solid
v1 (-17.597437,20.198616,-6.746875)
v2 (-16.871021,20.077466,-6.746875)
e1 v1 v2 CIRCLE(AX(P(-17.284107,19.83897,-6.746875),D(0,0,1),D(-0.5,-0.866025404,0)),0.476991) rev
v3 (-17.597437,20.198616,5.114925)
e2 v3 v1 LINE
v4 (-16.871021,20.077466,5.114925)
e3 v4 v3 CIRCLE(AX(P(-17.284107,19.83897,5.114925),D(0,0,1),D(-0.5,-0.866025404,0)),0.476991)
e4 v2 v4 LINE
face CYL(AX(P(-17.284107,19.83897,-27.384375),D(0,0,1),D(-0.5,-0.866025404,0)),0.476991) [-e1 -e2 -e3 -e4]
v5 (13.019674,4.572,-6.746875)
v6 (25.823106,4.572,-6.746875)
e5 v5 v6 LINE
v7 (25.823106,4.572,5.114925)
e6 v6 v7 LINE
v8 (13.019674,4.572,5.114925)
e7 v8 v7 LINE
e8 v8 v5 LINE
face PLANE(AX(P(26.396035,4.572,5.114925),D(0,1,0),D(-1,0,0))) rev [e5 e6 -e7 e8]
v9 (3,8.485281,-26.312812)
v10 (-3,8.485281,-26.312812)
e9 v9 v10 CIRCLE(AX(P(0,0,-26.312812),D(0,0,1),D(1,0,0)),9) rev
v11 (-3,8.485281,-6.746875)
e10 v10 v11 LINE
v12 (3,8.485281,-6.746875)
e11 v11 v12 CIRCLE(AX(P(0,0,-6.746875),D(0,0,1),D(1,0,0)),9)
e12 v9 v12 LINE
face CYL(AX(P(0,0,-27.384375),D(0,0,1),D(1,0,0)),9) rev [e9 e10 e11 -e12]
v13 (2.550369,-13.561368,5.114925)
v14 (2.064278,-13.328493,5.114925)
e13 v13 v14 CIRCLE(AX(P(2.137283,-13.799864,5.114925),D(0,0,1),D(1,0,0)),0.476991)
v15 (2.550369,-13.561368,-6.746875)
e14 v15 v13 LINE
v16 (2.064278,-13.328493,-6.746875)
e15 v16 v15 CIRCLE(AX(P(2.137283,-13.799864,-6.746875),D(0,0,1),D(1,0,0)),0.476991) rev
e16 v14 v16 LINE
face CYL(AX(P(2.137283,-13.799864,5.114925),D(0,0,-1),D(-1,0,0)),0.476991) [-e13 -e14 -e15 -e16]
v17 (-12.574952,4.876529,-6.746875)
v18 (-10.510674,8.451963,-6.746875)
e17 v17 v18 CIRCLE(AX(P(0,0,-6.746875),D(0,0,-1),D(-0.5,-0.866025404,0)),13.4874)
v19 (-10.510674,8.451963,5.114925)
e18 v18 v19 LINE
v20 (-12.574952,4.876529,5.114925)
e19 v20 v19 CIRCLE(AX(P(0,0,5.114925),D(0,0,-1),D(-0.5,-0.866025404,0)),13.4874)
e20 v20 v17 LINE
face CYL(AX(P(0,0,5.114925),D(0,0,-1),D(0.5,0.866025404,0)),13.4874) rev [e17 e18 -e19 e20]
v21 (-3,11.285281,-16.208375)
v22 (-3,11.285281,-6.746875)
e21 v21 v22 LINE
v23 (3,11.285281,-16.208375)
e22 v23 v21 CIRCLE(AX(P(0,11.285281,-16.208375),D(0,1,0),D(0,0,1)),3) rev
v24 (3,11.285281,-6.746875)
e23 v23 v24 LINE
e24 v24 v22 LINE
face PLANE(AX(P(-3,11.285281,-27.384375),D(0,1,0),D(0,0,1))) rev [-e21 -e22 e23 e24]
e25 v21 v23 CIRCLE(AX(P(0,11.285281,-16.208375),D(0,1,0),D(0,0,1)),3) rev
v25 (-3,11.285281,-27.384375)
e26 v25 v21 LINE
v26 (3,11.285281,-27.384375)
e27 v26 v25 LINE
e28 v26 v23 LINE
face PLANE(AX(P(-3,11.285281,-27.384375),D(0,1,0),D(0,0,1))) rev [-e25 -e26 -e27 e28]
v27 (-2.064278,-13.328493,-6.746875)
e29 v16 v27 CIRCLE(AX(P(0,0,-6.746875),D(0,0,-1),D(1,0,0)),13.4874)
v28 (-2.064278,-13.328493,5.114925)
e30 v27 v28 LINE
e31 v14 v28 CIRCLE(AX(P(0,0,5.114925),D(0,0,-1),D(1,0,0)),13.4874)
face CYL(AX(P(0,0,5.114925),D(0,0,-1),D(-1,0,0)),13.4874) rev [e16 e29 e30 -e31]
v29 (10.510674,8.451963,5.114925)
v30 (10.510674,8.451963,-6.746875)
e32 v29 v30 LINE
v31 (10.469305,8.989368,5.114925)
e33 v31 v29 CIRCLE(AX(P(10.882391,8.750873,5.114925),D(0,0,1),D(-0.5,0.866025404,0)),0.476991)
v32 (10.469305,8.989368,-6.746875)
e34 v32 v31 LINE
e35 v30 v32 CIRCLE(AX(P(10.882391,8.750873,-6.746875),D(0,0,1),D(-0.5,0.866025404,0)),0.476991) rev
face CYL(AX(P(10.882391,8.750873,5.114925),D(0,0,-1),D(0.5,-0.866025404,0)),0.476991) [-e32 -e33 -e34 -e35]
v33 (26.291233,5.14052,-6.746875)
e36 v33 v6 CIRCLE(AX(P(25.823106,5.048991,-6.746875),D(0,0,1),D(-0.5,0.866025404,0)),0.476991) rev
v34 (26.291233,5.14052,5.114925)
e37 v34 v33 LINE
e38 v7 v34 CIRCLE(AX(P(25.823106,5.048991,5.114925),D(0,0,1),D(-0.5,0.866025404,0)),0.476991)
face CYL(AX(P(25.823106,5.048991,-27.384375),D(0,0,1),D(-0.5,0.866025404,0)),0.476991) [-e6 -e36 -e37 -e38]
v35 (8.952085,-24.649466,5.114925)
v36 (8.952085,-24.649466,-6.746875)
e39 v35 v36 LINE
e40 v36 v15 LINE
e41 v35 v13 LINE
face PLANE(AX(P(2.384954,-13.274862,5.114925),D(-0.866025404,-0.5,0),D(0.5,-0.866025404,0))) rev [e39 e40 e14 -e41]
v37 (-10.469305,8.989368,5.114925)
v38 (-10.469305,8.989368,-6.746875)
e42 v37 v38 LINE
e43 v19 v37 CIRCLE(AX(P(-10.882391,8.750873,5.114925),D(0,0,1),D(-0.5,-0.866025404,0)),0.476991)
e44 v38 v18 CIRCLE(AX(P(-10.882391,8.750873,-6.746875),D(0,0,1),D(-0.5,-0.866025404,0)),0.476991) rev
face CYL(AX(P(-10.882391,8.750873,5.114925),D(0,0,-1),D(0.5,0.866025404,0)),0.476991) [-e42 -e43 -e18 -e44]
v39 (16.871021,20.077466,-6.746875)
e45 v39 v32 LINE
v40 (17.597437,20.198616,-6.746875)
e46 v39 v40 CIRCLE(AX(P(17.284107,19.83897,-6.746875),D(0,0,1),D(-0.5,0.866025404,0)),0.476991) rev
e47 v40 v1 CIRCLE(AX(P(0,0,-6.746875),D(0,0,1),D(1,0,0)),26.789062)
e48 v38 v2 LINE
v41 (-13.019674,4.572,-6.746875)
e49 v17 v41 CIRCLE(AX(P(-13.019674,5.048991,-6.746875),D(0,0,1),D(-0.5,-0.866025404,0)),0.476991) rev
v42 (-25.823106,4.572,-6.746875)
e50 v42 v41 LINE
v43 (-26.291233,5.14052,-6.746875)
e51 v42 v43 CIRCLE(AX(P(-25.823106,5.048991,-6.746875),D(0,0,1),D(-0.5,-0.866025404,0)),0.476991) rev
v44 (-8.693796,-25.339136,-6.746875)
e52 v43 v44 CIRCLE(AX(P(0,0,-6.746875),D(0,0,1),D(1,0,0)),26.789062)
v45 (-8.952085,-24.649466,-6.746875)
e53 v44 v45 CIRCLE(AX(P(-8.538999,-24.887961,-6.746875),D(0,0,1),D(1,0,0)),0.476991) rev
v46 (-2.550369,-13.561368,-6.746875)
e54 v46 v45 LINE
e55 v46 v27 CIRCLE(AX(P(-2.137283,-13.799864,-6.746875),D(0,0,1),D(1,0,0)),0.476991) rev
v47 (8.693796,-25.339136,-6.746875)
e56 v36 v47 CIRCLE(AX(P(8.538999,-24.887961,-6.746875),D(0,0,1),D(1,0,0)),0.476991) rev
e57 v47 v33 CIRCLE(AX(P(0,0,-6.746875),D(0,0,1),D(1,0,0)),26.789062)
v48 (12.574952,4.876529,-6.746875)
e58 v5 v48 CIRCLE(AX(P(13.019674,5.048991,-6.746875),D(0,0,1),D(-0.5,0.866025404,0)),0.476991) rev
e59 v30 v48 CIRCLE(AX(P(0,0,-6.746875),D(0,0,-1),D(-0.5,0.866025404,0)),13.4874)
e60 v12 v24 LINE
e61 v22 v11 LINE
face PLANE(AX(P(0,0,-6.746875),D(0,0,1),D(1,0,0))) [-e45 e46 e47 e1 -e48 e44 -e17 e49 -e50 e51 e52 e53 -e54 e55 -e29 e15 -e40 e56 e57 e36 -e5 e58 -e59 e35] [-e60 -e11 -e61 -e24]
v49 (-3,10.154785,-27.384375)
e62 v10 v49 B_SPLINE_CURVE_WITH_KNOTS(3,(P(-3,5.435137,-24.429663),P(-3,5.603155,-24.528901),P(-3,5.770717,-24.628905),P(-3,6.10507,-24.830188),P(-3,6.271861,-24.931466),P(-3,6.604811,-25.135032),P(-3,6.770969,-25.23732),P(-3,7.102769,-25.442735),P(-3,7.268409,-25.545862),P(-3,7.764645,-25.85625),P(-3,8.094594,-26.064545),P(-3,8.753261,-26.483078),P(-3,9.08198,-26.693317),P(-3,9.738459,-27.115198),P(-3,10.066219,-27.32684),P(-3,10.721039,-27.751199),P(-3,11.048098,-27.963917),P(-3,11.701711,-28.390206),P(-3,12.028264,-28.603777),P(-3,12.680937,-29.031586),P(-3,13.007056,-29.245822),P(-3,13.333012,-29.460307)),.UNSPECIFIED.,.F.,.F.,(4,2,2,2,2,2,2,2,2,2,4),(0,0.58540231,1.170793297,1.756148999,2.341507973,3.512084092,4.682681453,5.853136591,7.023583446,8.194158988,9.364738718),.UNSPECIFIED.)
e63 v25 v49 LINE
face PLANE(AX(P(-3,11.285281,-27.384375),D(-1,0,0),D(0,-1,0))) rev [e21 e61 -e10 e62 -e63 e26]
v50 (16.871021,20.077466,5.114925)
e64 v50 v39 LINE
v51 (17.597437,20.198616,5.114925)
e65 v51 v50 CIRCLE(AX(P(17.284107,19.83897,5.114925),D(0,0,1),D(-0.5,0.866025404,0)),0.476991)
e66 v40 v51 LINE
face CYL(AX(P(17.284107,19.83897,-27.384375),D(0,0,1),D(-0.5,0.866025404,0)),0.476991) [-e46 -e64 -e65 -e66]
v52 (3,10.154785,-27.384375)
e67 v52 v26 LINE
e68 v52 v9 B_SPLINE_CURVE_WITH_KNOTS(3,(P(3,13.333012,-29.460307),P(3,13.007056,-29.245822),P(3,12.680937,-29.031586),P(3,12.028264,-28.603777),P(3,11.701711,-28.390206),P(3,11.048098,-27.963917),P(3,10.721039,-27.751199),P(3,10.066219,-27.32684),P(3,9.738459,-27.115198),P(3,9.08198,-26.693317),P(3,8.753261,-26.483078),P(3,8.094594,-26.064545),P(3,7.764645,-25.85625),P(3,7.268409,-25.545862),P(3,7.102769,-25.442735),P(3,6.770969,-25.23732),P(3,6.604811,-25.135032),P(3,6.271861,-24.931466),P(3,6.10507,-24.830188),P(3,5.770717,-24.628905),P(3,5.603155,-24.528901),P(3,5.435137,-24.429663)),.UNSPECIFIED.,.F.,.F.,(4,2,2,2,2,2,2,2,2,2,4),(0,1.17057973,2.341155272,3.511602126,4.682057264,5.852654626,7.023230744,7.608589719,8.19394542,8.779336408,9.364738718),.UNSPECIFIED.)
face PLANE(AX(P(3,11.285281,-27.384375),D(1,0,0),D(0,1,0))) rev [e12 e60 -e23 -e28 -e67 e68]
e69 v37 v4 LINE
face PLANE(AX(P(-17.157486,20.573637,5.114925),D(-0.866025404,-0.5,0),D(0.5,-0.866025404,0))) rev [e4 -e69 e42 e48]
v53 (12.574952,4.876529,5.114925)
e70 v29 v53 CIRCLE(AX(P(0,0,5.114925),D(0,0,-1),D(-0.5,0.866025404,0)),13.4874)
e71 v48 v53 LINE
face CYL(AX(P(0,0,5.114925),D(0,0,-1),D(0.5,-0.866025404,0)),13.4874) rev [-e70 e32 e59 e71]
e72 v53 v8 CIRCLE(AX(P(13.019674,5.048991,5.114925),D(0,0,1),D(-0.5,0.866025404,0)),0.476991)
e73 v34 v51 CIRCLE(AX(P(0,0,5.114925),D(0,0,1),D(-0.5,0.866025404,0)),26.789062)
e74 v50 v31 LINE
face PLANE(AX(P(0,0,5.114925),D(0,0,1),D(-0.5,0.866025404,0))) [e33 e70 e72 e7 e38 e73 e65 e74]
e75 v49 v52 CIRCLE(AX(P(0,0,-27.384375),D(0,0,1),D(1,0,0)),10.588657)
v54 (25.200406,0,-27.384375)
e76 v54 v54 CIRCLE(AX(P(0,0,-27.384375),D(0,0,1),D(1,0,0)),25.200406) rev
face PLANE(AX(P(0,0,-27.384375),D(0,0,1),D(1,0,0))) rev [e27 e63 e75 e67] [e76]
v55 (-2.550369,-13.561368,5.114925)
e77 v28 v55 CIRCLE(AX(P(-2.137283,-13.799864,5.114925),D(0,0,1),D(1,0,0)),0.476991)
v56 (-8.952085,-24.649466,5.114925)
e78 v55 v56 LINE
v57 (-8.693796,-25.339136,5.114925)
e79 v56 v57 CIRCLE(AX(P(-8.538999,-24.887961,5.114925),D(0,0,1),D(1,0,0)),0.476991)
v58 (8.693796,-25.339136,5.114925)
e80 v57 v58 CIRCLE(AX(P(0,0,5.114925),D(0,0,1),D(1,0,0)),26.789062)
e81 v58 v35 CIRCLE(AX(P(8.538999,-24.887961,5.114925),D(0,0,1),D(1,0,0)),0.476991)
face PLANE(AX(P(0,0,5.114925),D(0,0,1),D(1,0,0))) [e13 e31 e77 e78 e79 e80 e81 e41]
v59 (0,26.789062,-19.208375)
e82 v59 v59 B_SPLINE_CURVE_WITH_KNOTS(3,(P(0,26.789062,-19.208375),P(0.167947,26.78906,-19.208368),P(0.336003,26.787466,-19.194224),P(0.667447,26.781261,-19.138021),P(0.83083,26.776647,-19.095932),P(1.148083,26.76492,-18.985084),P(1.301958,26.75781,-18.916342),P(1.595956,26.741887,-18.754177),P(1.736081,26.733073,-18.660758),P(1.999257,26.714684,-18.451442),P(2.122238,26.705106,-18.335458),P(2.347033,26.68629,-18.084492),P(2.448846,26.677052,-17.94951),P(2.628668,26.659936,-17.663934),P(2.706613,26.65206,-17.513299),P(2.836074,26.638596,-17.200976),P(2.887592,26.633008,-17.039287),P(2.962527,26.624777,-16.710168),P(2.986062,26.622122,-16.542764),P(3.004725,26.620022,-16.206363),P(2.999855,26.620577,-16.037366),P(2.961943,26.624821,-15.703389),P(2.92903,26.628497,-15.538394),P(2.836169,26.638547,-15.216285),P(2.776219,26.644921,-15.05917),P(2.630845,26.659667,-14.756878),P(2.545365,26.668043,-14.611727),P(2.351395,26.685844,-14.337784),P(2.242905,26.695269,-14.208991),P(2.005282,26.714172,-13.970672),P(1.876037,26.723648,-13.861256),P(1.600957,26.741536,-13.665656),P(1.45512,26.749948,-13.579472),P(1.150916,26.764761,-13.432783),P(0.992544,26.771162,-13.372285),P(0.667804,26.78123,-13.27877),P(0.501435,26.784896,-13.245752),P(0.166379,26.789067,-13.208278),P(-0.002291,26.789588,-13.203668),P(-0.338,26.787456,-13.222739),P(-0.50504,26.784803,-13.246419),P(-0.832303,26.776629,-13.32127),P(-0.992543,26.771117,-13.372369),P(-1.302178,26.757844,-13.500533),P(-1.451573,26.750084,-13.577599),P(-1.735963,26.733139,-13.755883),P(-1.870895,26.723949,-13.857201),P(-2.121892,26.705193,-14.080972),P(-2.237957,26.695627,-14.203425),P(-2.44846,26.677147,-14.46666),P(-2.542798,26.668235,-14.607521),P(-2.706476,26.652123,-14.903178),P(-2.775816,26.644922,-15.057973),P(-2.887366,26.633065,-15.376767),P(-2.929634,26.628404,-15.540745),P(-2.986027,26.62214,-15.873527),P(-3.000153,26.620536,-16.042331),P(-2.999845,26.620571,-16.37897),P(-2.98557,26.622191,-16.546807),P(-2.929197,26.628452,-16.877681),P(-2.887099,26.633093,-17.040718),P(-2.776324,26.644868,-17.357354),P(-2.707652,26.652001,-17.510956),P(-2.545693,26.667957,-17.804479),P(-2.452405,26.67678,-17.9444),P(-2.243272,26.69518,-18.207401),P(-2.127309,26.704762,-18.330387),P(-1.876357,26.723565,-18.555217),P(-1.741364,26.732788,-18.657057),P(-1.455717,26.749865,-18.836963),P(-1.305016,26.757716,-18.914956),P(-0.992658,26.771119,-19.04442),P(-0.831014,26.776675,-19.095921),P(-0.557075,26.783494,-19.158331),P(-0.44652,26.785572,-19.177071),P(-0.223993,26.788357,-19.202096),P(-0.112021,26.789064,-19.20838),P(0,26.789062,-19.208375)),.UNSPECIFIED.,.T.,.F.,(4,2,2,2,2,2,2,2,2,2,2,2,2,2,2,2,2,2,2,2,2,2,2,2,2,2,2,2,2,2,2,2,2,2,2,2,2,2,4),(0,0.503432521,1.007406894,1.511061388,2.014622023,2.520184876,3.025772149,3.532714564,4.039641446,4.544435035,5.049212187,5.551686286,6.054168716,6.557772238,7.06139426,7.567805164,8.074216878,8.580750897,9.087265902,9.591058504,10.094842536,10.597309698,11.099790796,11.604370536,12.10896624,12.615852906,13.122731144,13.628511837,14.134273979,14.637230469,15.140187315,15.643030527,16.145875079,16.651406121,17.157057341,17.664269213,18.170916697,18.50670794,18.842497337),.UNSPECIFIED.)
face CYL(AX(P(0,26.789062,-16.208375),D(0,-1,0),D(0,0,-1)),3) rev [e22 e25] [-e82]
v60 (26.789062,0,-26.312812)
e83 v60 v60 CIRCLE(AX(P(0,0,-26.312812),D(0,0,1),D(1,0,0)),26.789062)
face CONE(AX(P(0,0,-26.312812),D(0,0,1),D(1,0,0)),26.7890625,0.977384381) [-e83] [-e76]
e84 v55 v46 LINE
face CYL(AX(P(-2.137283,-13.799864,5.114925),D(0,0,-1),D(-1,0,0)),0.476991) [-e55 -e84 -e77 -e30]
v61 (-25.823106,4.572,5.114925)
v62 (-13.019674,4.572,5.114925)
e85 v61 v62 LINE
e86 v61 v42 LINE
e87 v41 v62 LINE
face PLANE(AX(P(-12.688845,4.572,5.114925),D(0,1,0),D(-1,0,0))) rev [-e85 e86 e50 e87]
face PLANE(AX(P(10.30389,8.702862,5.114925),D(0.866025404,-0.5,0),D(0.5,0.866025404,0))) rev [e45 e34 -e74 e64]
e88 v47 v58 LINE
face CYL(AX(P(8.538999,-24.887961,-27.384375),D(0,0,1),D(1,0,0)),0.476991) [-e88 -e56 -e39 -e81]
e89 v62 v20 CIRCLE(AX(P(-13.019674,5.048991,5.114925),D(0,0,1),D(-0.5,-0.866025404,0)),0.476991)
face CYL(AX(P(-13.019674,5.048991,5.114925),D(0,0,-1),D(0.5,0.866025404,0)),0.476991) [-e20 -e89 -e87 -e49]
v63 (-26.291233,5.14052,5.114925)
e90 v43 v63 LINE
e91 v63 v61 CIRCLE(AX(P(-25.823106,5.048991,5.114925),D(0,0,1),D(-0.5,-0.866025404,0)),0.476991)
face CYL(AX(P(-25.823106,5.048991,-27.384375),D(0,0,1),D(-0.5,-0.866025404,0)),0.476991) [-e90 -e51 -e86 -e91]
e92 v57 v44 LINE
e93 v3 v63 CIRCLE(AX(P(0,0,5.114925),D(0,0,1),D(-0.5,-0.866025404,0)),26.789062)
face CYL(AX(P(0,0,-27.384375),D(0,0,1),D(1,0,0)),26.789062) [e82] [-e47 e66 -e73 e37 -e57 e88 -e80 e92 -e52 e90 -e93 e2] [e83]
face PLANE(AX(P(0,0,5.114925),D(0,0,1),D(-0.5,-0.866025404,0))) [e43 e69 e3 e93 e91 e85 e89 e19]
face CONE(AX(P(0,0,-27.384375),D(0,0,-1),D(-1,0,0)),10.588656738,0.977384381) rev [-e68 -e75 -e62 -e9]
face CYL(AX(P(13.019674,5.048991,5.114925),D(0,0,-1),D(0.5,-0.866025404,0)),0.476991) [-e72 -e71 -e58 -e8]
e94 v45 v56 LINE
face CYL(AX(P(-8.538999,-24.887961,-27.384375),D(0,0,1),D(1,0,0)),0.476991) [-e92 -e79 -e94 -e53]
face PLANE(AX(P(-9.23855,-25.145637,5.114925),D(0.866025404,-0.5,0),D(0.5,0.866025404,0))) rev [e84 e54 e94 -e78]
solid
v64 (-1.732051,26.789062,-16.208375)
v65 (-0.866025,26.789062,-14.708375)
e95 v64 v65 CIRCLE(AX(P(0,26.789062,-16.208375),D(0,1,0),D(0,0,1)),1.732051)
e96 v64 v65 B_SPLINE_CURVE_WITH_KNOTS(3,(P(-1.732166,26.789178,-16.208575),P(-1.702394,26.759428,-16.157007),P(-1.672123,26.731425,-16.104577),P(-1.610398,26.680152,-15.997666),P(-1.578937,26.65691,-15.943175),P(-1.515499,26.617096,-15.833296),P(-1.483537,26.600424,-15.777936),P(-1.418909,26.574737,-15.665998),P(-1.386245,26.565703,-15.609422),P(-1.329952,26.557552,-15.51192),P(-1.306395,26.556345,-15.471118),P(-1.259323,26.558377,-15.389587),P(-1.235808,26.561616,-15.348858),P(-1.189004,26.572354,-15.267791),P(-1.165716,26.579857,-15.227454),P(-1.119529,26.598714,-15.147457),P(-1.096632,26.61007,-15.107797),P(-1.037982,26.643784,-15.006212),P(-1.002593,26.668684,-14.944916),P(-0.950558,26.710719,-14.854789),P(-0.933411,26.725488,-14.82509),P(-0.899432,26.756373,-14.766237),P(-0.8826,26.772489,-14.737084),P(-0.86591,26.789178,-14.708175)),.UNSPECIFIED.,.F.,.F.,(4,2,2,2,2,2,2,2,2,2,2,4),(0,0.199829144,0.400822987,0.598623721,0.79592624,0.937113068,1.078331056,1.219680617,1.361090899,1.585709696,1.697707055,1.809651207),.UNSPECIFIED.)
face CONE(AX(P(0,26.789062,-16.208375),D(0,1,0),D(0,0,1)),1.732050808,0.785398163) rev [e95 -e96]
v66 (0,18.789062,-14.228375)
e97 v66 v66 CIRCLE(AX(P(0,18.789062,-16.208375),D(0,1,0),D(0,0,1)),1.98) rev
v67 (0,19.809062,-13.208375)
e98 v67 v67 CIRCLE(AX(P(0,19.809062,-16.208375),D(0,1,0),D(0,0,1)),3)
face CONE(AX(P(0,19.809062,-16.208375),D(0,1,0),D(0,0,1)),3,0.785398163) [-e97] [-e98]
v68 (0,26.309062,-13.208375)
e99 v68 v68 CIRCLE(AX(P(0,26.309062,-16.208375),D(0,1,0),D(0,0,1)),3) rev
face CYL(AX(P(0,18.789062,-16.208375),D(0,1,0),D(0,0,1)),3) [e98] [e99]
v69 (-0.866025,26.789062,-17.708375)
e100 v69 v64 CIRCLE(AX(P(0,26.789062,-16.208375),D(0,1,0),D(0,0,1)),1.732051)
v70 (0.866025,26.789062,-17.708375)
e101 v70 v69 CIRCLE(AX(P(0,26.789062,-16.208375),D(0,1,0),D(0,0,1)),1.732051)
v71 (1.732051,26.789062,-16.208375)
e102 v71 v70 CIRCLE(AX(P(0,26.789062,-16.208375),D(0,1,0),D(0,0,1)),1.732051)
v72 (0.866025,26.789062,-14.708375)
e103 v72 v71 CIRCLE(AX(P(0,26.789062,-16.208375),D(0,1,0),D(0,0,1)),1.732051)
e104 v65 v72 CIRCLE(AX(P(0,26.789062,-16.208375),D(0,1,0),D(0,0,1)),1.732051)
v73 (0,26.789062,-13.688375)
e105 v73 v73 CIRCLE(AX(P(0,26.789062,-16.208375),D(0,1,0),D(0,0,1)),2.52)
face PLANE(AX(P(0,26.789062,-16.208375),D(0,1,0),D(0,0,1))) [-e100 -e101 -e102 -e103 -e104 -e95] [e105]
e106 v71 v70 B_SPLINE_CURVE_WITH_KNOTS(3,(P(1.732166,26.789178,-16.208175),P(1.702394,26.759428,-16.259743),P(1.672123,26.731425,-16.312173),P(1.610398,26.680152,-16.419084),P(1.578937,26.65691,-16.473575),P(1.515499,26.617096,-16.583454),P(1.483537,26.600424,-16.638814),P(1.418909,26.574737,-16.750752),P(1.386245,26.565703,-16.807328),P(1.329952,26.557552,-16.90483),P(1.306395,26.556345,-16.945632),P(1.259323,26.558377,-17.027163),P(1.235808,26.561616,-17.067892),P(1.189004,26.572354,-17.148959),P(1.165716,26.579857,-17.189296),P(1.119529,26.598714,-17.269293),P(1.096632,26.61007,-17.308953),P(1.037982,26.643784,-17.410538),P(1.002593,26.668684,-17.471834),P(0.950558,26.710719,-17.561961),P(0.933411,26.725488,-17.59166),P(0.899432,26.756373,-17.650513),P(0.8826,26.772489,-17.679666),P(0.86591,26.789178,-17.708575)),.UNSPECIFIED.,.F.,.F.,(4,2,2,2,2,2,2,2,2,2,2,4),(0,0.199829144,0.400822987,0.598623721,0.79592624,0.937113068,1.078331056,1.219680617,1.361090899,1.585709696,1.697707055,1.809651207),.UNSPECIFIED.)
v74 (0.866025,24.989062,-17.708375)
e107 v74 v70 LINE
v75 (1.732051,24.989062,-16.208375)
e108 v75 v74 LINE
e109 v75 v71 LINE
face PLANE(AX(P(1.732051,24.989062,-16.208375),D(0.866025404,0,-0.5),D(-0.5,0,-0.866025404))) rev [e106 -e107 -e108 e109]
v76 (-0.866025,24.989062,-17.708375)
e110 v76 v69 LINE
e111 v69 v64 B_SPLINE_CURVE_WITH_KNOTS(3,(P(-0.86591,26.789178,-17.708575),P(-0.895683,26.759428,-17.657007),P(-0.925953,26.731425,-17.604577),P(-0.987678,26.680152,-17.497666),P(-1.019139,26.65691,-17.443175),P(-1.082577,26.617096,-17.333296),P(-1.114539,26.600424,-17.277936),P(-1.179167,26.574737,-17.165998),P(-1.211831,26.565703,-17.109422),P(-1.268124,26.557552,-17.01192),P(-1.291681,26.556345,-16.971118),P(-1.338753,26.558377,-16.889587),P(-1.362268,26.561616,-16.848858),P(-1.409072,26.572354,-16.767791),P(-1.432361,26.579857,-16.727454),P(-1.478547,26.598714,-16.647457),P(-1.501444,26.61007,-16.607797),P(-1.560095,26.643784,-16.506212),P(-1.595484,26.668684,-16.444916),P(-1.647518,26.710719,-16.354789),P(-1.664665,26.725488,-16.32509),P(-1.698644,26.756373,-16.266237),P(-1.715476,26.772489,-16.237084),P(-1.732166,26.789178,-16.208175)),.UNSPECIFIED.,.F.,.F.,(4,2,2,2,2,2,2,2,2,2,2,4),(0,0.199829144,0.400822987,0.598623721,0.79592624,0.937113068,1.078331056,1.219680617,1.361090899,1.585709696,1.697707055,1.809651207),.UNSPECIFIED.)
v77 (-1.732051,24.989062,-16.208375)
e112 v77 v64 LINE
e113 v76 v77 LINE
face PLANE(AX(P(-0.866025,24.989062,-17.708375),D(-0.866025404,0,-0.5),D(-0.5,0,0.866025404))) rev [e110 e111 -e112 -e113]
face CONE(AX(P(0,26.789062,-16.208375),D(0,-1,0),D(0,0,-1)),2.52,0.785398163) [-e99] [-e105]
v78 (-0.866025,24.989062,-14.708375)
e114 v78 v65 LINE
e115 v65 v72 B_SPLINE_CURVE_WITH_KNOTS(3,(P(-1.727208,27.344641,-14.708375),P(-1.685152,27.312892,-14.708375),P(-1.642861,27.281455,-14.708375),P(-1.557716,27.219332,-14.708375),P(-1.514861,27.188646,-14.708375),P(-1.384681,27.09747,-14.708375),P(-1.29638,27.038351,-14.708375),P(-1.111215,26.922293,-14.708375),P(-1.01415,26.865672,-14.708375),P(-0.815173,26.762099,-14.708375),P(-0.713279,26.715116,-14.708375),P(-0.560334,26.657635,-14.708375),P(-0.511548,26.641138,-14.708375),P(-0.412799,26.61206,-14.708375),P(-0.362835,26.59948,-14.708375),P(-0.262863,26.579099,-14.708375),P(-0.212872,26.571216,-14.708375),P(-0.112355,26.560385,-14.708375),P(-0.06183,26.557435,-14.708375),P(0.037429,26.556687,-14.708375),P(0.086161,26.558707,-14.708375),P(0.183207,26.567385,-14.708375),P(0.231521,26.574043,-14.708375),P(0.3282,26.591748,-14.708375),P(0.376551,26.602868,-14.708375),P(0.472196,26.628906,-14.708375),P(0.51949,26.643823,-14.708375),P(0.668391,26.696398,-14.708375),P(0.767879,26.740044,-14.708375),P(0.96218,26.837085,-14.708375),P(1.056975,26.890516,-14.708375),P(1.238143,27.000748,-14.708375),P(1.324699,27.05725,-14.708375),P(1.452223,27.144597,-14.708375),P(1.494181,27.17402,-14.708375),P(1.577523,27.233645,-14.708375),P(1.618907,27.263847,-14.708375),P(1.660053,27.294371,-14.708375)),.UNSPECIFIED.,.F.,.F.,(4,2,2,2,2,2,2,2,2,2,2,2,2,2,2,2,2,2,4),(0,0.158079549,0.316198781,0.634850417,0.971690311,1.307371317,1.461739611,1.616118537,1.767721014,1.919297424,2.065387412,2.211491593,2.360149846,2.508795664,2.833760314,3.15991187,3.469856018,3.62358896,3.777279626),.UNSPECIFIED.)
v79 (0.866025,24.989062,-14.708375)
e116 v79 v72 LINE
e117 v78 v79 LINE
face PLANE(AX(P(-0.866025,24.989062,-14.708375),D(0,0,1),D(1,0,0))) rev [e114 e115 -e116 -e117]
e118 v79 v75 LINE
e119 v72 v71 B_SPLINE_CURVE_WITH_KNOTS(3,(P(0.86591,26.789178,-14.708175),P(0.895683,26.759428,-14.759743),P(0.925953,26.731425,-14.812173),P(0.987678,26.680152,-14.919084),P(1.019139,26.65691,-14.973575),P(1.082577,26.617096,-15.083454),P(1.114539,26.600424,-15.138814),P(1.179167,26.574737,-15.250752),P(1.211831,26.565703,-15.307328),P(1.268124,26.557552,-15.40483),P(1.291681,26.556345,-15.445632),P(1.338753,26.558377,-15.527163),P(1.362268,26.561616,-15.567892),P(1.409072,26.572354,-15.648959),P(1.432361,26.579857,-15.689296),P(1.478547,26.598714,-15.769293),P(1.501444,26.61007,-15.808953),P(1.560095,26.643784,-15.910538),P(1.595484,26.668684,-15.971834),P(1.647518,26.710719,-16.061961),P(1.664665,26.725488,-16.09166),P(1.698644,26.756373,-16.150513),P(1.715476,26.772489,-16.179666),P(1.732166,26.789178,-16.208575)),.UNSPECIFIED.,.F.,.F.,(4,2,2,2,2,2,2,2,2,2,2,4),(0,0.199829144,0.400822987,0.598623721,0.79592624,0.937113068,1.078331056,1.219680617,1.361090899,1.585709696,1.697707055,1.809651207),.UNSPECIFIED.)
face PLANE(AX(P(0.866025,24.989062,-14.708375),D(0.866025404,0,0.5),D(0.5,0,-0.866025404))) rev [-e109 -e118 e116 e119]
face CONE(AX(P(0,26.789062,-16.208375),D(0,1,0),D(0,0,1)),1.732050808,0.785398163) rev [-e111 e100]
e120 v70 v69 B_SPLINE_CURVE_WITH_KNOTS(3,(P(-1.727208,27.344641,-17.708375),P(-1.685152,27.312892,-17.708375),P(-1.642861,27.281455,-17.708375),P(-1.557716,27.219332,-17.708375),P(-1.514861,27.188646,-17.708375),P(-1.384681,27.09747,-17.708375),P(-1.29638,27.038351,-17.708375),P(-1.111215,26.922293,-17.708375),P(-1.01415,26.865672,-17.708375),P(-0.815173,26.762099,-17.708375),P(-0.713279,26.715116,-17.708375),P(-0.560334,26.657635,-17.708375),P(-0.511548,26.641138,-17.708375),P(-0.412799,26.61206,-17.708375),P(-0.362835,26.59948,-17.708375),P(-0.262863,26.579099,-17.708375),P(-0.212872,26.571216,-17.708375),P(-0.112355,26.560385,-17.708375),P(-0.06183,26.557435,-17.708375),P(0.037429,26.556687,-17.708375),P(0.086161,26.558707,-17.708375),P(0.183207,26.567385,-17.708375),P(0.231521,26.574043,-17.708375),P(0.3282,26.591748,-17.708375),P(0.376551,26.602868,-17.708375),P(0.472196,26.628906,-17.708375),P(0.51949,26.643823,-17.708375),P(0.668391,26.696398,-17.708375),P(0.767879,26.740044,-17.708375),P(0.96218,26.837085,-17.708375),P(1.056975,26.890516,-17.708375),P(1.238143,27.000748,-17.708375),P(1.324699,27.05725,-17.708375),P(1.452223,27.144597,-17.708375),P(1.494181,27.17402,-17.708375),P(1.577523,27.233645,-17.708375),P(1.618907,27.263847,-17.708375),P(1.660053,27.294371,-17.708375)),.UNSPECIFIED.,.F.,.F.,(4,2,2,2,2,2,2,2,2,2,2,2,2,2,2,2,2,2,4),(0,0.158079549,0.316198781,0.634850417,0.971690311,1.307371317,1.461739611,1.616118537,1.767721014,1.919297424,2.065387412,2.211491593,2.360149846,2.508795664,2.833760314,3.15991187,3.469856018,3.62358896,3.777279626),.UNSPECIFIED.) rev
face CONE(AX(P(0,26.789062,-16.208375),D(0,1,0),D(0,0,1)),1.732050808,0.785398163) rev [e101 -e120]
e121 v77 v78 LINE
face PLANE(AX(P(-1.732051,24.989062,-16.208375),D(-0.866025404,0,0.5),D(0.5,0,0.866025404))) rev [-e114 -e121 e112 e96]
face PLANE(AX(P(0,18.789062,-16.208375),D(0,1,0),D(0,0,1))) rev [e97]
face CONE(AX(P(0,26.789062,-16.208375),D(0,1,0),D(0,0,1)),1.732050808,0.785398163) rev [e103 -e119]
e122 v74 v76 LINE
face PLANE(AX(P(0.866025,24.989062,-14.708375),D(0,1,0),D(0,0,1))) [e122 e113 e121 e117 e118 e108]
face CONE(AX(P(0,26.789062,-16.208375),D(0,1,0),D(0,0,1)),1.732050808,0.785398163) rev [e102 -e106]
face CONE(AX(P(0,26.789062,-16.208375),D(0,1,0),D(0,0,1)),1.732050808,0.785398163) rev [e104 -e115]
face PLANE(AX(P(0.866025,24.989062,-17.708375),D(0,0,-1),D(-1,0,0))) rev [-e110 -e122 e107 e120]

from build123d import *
from OCP.BRepFilletAPI import BRepFilletAPI_MakeChamfer

# Parameters (mm, degrees)
BOSS_EXTRUDE1_START      = -6.746875
SKETCH1_R                = 26.7890625
BOSS_EXTRUDE1_DEPTH      = 20.6375
BOSS_EXTRUDE2_DEPTH      = 11.8618
FILLET1_R                = 0.476990821
CIRPATTERN1_COUNT        = 3
FILLET1_OF_CIRPATTERN1_R = 0.476990821
CUT_EXTRUDE5_DEPTH       = 47.746248335
CUT_EXTRUDE5_DEPTH_BACK  = 47.746248335
SKETCH15_R               = 9
CHAMFER1_SIZE            = 1.0715625
CHAMFER1_SIZE2           = 1.588656738
CUT_EXTRUDE1_DEPTH       = 47.746248335
CUT_EXTRUDE1_DEPTH_BACK  = 47.746248335
SKETCH5_R                = 3
CUT_EXTRUDE2_DEPTH       = 47.746248335
SKETCH6_R                = 3
BOSS_EXTRUDE3_DEPTH      = 8
CUT_EXTRUDE3_DEPTH       = 1.8
CHAMFER3_SIZE            = 0.48
CHAMFER4_SIZE            = 1.02


with BuildPart() as part:
    # Sketch1 → Boss-Extrude1 (new body)
    with BuildSketch(Plane.XY.offset(BOSS_EXTRUDE1_START)):
        Circle(SKETCH1_R)
    extrude(amount=-BOSS_EXTRUDE1_DEPTH)

    # Sketch2 → Boss-Extrude2 (add)
    with BuildSketch(Plane.XY.offset(-6.746875)):
        with BuildLine():
            Line((-9.238549561, -25.145637229), (-2.384954104, -13.274861682))
            ThreePointArc((-2.384954104, -13.274861682), (0, -13.4874), (2.384954104, -13.274861682))
            Line((2.384954104, -13.274861682), (9.238549561, -25.145637229))
            ThreePointArc((9.238549561, -25.145637229), (0, -26.7890625), (-9.238549561, -25.145637229))
        make_face()
    boss_extrude2 = extrude(amount=BOSS_EXTRUDE2_DEPTH)

    # Fillet1
    # the kernel refuses this fillet: 0.476990821 mm, written as the material it takes off along each edge
    with BuildSketch(Plane(origin=(-9.238549561, -25.145637229, -6.746875), x_dir=(0.9423194959651416, -0.33471475546202245, 0), z_dir=(0, 0, 1))) as fillet1_piece_1:
        with BuildLine():
            CenterArc((0.572952448, 0.476963054), FILLET1_R, 169.55519331, 101.063030663)
            Line((0.103865366, 0.563435893), (0, 0))
            ThreePointArc((0, 0), (0.28904955, -0.001559444), (0.5780991, 0))
        make_face()
    extrude(amount=13.307047751, mode=Mode.SUBTRACT)
    with BuildSketch(Plane(origin=(9.238549561, -25.145637229, -6.746875), x_dir=(-0.9423194959651411, -0.3347147554620237, 0), z_dir=(0, 0, 1))) as fillet1_piece_2:
        with BuildLine():
            CenterArc((0.572952448, -0.476963054), FILLET1_R, 89.381776027, 101.063030663)
            Line((0.103865366, -0.563435893), (0, 0))
            ThreePointArc((0, 0), (0.28904955, 0.001559444), (0.5780991, 0))
        make_face()
    extrude(amount=13.307047751, mode=Mode.SUBTRACT)
    with BuildSketch(Plane(origin=(2.384954104, -13.274861682, -6.746875), x_dir=(0.49999999999999706, -0.8660254037844404, 0), z_dir=(0, 0, 1))) as fillet1_piece_3:
        with BuildLine():
            CenterArc((0.330829178, -0.476990821), FILLET1_R, 90, 68.803855098)
            ThreePointArc((-0.113892323, -0.304529143), (-0.056028498, -0.152607773), (0, 0))
            Line((0, 0), (0.330829178, 0))
        make_face()
    extrude(amount=12.688872944, mode=Mode.SUBTRACT)
    with BuildSketch(Plane(origin=(-2.384954104, -13.274861682, -6.746875), x_dir=(0.9863015455813384, -0.16495229972286882, 0), z_dir=(0, 0, 1))) as fillet1_piece_4:
        with BuildLine():
            CenterArc((0.330879129, -0.476956172), FILLET1_R, 90.690608377, 68.803855098)
            Line((-0.115888763, -0.309867293), (0, 0))
            ThreePointArc((0, 0), (0.162564956, -0.000979741), (0.325129912, 0))
        make_face()
    extrude(amount=12.688872944, mode=Mode.SUBTRACT)

    # CirPattern1: Boss-Extrude2 ×3 about axis
    cirpattern1_axis = Axis((0, 0, 0), (0, 0, 1))
    for i in range(1, CIRPATTERN1_COUNT):
        add(boss_extrude2.rotate(cirpattern1_axis, i * 360 / CIRPATTERN1_COUNT))

    # Fillet1 of CirPattern1
    # the kernel refuses this fillet: 0.476990821 mm, written as the material it takes off along each edge
    with BuildSketch(Plane(origin=(26.396035415, 4.572, -6.746875), x_dir=(-0.18128826673094764, 0.9834299997181745, 0), z_dir=(0, 0, 1)), Plane(origin=(-17.157485854, 20.573637229, -6.746875), x_dir=(-0.761031229234182, -0.6487152442561451, 0), z_dir=(0, 0, 1))) as fillet1_of_cirpattern1_piece_1:
        with BuildLine():
            CenterArc((0.572952448, 0.476963054), FILLET1_OF_CIRPATTERN1_R, 169.55519331, 101.063030663)
            Line((0.103865366, 0.563435893), (0, 0))
            ThreePointArc((0, 0), (0.28904955, -0.001559444), (0.5780991, 0))
        make_face()
    extrude(amount=13.307047751, mode=Mode.SUBTRACT)
    with BuildSketch(Plane(origin=(17.157485854, 20.573637229, -6.746875), x_dir=(0.7610312292341833, -0.6487152442561435, 0), z_dir=(0, 0, 1)), Plane(origin=(-26.396035415, 4.572, -6.746875), x_dir=(0.181288266730962, 0.9834299997181718, 0), z_dir=(0, 0, 1))) as fillet1_of_cirpattern1_piece_2:
        with BuildLine():
            CenterArc((0.572952448, -0.476963054), FILLET1_OF_CIRPATTERN1_R, 89.381776027, 101.063030663)
            Line((0.103865366, -0.563435893), (0, 0))
            ThreePointArc((0, 0), (0.28904955, 0.001559444), (0.5780991, 0))
        make_face()
    extrude(amount=13.307047751, mode=Mode.SUBTRACT)
    with BuildSketch(Plane(origin=(10.303890396, 8.702861682, -6.746875), x_dir=(0.5000000000000006, 0.8660254037844383, 0), z_dir=(0, 0, 1)), Plane(origin=(-12.688844501, 4.572, -6.746875), x_dir=(-1, 0, 0), z_dir=(0, 0, 1))) as fillet1_of_cirpattern1_piece_3:
        with BuildLine():
            CenterArc((0.330829178, -0.476990821), FILLET1_OF_CIRPATTERN1_R, 90, 68.803855098)
            ThreePointArc((-0.113892323, -0.304529143), (-0.056028498, -0.152607773), (0, 0))
            Line((0, 0), (0.330829178, 0))
        make_face()
    extrude(amount=12.688872944, mode=Mode.SUBTRACT)
    with BuildSketch(Plane(origin=(12.688844501, 4.572, -6.746875), x_dir=(-0.3502978908180006, 0.9366383441267288, 0), z_dir=(0, 0, 1)), Plane(origin=(-10.303890396, 8.702861682, -6.746875), x_dir=(-0.6360036547633316, -0.7716860444038657, 0), z_dir=(0, 0, 1))) as fillet1_of_cirpattern1_piece_4:
        with BuildLine():
            CenterArc((0.330879129, -0.476956172), FILLET1_OF_CIRPATTERN1_R, 90.690608377, 68.803855098)
            Line((-0.115888763, -0.309867293), (0, 0))
            ThreePointArc((0, 0), (0.162564956, -0.000979741), (0.325129912, 0))
        make_face()
    extrude(amount=12.688872944, mode=Mode.SUBTRACT)

    # Sketch15 → Cut-Extrude5 (cut, two sides: drawn at the far end of the back side and taken through both)
    with BuildSketch(Plane.XY.offset(-CUT_EXTRUDE5_DEPTH_BACK)):
        Circle(SKETCH15_R)
    extrude(amount=CUT_EXTRUDE5_DEPTH + CUT_EXTRUDE5_DEPTH_BACK, mode=Mode.SUBTRACT)

    # Chamfer1: one chamfer whose edges measure the first distance from different faces: ONE call of the kernel's chamfer builder (chamfer() names one face for all edges)
    chamfer1_edges_1 = [part.edges().sort_by_distance(p)[0] for p in [
        (-26.7890625, 0, -27.384375),
    ]]
    chamfer1_side_1 = [part.faces().sort_by_distance(p)[0] for p in [
        (-26.7890625, 0, -17.065625),
    ]]
    chamfer1_edges_2 = [part.edges().sort_by_distance(p)[0] for p in [
        (-9, 0, -27.384375),
    ]]
    chamfer1_side_2 = [part.faces().sort_by_distance(p)[0] for p in [
        (-9, 0, -17.065625),
    ]]
    chamfer1 = BRepFilletAPI_MakeChamfer(part.part.solid().wrapped)
    for e in chamfer1_edges_1:
        chamfer1.Add(CHAMFER1_SIZE, CHAMFER1_SIZE2, e.wrapped, chamfer1_side_1[0].wrapped)  # the first distance lies on this face
    for e in chamfer1_edges_2:
        chamfer1.Add(CHAMFER1_SIZE, CHAMFER1_SIZE2, e.wrapped, chamfer1_side_2[0].wrapped)  # the first distance lies on this face
    add(Compound.cast(chamfer1.Shape()), mode=Mode.REPLACE)

    # Sketch4 → Cut-Extrude1 (cut, two sides: drawn at the far end of the back side and taken through both)
    with BuildSketch(Plane.XY.offset(-CUT_EXTRUDE1_DEPTH_BACK)):
        with BuildLine():
            Line((-3, 11.285281374), (3, 11.285281374))
            Line((3, 11.285281374), (3, 8.485281374))
            ThreePointArc((3, 8.485281374), (0, 9), (-3, 8.485281374))
            Line((-3, 8.485281374), (-3, 11.285281374))
        make_face()
    extrude(amount=CUT_EXTRUDE1_DEPTH + CUT_EXTRUDE1_DEPTH_BACK, mode=Mode.SUBTRACT)

    # Sketch5 → Cut-Extrude2 (cut, through all)
    with BuildSketch(Plane(origin=(0, 0, 0), x_dir=(1, 0, 0), z_dir=(0, 1, 0))):
        with Locations(Location((0, 16.208375, 0), (0, 0, 90))):
            Circle(SKETCH5_R)
    extrude(amount=CUT_EXTRUDE2_DEPTH, mode=Mode.SUBTRACT)


with BuildPart() as body_2:
    # Sketch6 → Boss-Extrude3 (new body)
    with BuildSketch(Plane(origin=(0, 26.7890625, 0), x_dir=(-1, 0, 0), z_dir=(0, 1, 0))):
        with Locations(Location((0, -16.208375, 0), (0, 0, 90))):
            Circle(SKETCH6_R)
    extrude(amount=-BOSS_EXTRUDE3_DEPTH)

    # Sketch8 → Cut-Extrude3 (cut)
    with BuildSketch(Plane(origin=(0, 26.7890625, 0), x_dir=(1, 0, 0), z_dir=(0, 1, 0))):
        Polygon((0.866025404, 14.708375), (1.732050808, 16.208375), (0.866025404, 17.708375), (-0.866025404, 17.708375), (-1.732050808, 16.208375), (-0.866025404, 14.708375), align=None)
    extrude(amount=-CUT_EXTRUDE3_DEPTH, mode=Mode.SUBTRACT)

    # Cut-Extrude4 cone 1 section (through the dimple's axis) → Cut-Extrude4 (revolve, cut)
    with BuildSketch(Plane(origin=(0, 26.7890625, -16.208375), x_dir=(0, 0, 1), z_dir=(1, 0, 0))):
        Polygon((0, 0), (1.732050808, 0), (0, 1.732050808), align=None)
    revolve(axis=Axis((0, 26.7890625, -16.208375), (0, -1, 0)), mode=Mode.SUBTRACT)

    # Chamfer3
    chamfer3_edges = [body_2.edges().sort_by_distance(p)[0] for p in [
        (0, 26.7890625, -19.208375),
    ]]
    chamfer(chamfer3_edges, length=CHAMFER3_SIZE)

    # Chamfer4
    chamfer4_edges = [body_2.edges().sort_by_distance(p)[0] for p in [
        (0, 18.7890625, -19.208375),
    ]]
    chamfer(chamfer4_edges, length=CHAMFER4_SIZE)


solid = Compound([part.part, body_2.part])
